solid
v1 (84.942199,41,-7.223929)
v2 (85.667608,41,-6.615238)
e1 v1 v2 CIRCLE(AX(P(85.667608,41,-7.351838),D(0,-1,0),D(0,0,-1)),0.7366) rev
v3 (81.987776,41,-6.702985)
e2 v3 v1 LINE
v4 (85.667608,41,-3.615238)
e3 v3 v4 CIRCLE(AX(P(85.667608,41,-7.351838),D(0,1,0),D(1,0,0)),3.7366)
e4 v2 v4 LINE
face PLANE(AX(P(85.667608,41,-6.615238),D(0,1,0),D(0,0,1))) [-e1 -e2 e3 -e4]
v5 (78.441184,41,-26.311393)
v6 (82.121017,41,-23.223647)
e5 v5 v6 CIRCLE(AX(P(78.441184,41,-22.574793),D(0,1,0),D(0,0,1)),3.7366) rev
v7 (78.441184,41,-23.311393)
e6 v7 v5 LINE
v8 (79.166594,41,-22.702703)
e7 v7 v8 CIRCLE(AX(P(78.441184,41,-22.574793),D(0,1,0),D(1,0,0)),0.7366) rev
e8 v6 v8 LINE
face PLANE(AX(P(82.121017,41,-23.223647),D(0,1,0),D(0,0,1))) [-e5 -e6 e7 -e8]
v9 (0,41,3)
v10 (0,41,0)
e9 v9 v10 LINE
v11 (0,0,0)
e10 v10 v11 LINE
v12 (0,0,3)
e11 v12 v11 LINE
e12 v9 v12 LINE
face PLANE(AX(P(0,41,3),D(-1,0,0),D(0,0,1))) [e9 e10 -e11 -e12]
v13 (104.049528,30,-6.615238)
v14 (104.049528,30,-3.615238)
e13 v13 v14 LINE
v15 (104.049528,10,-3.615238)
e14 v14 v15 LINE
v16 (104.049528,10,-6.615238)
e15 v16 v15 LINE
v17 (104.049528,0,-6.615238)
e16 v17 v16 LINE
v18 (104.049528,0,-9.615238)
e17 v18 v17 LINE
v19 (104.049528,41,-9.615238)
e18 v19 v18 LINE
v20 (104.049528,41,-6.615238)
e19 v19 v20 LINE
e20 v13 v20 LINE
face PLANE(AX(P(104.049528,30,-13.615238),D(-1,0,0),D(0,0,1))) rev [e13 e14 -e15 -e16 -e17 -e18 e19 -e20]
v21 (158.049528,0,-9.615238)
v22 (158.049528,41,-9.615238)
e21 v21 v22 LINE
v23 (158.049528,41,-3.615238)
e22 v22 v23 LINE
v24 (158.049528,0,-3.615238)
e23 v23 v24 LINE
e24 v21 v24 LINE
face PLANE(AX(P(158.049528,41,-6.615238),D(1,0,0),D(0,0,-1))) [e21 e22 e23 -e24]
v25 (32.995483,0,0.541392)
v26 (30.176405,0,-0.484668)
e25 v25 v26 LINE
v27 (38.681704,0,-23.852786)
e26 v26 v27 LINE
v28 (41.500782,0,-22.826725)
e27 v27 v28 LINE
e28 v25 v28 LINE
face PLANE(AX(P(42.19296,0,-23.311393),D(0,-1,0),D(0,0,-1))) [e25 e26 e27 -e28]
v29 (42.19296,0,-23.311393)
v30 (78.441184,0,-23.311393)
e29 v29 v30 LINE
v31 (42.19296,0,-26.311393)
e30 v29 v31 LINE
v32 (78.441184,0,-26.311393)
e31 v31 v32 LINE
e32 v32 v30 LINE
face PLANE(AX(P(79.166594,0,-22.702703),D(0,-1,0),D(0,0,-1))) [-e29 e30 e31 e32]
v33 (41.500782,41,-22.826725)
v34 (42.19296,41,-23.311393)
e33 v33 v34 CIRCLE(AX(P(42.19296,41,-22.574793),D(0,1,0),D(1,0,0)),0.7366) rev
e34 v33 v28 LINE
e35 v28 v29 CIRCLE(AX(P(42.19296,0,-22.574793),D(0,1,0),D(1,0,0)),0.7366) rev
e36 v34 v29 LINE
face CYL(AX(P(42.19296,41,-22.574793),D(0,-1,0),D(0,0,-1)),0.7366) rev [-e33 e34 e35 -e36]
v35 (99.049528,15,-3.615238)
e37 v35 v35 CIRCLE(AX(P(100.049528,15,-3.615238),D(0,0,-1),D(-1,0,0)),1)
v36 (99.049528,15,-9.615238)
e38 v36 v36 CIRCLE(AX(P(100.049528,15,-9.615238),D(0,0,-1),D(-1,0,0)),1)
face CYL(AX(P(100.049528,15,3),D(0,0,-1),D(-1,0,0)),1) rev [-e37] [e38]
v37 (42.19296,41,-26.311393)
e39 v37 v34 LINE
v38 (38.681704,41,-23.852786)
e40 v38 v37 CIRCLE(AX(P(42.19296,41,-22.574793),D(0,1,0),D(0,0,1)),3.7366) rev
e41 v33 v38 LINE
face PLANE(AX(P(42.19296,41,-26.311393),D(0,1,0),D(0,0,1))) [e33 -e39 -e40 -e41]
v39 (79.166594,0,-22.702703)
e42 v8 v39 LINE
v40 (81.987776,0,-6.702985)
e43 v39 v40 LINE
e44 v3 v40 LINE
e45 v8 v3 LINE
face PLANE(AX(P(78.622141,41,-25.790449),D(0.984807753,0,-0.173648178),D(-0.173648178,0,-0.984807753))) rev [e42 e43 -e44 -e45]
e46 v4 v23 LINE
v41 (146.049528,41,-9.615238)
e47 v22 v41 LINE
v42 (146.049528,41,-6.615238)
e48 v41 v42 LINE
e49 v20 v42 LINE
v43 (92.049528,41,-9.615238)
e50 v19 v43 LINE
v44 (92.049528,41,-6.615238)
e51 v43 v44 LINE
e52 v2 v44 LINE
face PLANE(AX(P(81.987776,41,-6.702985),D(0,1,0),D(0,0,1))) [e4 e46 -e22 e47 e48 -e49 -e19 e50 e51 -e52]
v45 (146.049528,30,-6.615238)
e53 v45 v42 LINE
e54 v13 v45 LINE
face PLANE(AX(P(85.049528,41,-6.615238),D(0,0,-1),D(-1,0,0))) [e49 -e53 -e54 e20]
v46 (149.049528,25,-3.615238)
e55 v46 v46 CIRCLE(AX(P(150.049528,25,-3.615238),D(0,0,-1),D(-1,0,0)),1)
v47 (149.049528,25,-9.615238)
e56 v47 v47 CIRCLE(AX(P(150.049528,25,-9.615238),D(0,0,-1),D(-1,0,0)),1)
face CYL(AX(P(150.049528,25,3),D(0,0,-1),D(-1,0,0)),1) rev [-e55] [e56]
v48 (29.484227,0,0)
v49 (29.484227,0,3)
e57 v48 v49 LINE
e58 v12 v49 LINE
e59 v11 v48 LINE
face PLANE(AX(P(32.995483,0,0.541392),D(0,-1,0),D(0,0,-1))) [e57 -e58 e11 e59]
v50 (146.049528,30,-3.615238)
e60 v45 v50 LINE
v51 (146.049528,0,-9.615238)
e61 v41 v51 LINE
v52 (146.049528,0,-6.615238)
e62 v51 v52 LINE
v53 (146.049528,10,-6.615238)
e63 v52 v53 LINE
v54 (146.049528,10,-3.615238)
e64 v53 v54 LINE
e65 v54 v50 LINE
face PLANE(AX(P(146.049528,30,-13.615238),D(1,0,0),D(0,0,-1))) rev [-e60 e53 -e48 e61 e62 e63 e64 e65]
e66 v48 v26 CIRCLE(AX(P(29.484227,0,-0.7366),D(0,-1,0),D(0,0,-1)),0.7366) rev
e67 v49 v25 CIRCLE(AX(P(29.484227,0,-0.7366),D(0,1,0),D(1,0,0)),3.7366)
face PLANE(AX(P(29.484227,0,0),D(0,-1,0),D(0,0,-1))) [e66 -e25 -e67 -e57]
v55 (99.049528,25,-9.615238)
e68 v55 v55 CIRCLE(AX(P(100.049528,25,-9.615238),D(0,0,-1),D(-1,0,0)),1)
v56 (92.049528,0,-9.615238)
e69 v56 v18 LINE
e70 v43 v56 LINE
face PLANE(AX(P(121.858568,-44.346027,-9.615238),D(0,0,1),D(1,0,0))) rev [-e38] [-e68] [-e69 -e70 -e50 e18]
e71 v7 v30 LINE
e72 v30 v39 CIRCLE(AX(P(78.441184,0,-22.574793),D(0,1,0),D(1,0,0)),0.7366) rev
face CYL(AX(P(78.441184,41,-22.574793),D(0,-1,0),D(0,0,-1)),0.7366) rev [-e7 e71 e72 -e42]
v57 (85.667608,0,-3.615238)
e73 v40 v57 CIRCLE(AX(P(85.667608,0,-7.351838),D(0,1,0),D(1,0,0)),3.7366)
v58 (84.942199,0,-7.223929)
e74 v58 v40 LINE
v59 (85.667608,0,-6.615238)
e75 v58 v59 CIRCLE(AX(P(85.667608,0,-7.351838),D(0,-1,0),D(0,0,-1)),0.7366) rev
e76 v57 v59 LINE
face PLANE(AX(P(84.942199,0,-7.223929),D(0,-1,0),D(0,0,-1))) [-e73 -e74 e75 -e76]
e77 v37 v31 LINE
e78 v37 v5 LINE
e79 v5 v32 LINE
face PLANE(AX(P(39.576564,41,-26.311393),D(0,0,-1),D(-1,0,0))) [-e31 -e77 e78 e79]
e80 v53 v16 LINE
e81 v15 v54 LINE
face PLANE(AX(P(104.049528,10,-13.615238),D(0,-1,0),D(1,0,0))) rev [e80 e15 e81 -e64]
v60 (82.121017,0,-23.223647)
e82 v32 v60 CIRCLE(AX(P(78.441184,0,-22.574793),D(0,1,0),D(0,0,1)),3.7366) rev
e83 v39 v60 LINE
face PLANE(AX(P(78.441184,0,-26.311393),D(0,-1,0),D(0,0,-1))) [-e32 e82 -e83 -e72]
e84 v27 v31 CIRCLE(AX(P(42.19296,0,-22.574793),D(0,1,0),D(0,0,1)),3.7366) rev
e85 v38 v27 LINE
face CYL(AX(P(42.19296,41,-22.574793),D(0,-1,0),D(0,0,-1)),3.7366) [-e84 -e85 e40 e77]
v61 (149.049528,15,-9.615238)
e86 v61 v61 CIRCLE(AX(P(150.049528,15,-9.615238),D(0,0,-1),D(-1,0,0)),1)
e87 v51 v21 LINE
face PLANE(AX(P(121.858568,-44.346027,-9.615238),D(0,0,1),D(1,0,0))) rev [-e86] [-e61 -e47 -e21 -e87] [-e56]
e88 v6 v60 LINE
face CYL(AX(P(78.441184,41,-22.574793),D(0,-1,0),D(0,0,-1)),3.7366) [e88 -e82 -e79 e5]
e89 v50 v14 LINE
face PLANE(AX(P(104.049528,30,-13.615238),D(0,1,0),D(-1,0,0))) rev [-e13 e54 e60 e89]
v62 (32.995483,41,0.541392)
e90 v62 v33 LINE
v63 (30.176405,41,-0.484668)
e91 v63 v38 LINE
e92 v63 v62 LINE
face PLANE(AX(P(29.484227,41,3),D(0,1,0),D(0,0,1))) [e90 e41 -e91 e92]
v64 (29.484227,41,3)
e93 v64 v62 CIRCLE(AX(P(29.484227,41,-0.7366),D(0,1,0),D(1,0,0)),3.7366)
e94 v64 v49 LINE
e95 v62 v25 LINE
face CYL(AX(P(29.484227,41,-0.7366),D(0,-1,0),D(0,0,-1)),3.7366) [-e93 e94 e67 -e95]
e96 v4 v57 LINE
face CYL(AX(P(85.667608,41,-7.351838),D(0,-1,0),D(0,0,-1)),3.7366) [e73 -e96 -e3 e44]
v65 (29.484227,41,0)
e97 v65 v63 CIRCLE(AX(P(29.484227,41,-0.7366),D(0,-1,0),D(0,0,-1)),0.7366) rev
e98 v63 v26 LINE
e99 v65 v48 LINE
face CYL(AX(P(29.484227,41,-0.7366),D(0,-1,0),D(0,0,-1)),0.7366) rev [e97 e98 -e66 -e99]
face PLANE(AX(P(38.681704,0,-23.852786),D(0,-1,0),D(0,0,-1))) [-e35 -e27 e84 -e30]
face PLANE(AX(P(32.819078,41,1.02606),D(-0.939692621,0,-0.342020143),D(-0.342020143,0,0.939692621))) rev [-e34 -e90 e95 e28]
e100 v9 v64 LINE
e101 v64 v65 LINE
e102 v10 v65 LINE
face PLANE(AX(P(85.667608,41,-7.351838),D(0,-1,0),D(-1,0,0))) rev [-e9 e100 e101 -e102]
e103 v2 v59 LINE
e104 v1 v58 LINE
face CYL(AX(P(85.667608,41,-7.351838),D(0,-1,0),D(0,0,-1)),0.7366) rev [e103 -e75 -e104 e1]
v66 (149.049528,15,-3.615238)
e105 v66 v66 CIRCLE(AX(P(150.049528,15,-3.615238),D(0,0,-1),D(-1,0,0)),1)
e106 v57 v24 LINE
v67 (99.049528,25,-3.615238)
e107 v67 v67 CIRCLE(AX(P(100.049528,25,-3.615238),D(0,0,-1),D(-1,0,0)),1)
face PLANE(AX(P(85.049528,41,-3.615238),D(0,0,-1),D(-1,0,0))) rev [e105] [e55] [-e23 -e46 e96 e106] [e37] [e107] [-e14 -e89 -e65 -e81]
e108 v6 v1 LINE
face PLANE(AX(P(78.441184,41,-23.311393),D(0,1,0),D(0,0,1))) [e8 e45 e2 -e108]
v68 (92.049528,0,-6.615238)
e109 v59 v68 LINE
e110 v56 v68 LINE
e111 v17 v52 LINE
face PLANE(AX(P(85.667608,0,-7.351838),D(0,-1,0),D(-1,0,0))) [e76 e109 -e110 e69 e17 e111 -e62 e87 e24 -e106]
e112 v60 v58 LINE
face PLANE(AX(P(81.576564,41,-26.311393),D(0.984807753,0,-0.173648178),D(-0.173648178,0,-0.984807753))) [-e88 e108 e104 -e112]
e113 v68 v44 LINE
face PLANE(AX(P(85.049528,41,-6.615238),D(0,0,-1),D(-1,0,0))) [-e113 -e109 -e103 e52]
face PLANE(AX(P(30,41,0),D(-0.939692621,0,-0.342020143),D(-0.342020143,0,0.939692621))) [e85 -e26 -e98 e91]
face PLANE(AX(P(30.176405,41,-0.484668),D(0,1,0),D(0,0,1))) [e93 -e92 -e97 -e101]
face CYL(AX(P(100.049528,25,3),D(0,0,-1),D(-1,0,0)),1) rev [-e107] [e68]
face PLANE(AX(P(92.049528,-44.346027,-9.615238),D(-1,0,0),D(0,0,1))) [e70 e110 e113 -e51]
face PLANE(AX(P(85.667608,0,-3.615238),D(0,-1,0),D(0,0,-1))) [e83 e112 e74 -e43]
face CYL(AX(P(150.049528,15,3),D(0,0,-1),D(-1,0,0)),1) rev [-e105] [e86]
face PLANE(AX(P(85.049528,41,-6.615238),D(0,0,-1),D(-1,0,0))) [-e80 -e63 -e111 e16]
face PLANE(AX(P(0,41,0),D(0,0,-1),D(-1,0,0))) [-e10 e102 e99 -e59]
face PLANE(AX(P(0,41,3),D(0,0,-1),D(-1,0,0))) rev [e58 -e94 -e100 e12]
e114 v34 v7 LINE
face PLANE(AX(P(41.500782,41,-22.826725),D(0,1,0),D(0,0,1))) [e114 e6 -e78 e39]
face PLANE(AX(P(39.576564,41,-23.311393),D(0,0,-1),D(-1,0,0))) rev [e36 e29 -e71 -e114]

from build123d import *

# Parameters (mm, degrees)
BASE_FLANGE1_DEPTH  = 41
SKETCH2_W           = 42
SKETCH2_H           = 20
CUT_EXTRUDE1_DEPTH  = 10
BOSS_EXTRUDE1_DEPTH = 6
SKETCH5_R           = 1
CUT_EXTRUDE3_DEPTH  = 165.132308696


# Sheet-metal steps are written as plain solids
with BuildPart() as part:
    # Sketch1 → Base-Flange1 (new body)
    with BuildSketch(Plane(origin=(0, 0, 0), x_dir=(1, 0, 0), z_dir=(0, 1, 0))):
        with BuildLine():
            Line((0, 0), (29.484227127, 0))
            ThreePointArc((29.484227127, 0), (29.90672353, 0.133212604), (30.176404712, 0.484667962))
            Line((30.176404712, 0.484667962), (38.681704054, 23.85278585))
            ThreePointArc((38.681704054, 23.85278585), (40.049733788, 25.635636911), (42.1929595, 26.311393382))
            Line((42.1929595, 26.311393382), (78.441184331, 26.311393382))
            ThreePointArc((78.441184331, 26.311393382), (80.843024514, 25.437195048), (82.121016981, 23.223647163))
            Line((82.121016981, 23.223647163), (84.942198964, 7.223929074))
            ThreePointArc((84.942198964, 7.223929074), (85.194131001, 6.787569985), (85.667608355, 6.615238322))
            Line((85.667608355, 6.615238322), (158.049527566, 6.615238322))
            Line((158.049527566, 6.615238322), (158.049527566, 3.615238322))
            Line((158.049527566, 3.615238322), (85.667608355, 3.615238322))
            ThreePointArc((85.667608355, 3.615238322), (83.265768172, 4.489436656), (81.987775705, 6.702984541))
            Line((81.987775705, 6.702984541), (79.166593722, 22.70270263))
            ThreePointArc((79.166593722, 22.70270263), (78.914661685, 23.139061719), (78.441184331, 23.311393382))
            Line((78.441184331, 23.311393382), (42.1929595, 23.311393382))
            ThreePointArc((42.1929595, 23.311393382), (41.770463097, 23.178180778), (41.500781916, 22.82672542))
            Line((41.500781916, 22.82672542), (32.995482574, -0.541392468))
            ThreePointArc((32.995482574, -0.541392468), (31.627452839, -2.324243529), (29.484227127, -3))
            Line((29.484227127, -3), (0, -3))
            Line((0, -3), (0, 0))
        make_face()
    extrude(amount=BASE_FLANGE1_DEPTH)

    # Sketch2 → Cut-Extrude1 (cut)
    with BuildSketch(Plane.XY.offset(-3.615238322)):
        with Locations((125.049527566, 20)):
            Rectangle(SKETCH2_W, SKETCH2_H)
    extrude(amount=-CUT_EXTRUDE1_DEPTH, mode=Mode.SUBTRACT)

    # Sketch3 → Boss-Extrude1 (add)
    with BuildSketch(Plane.XY.offset(-3.615238322)):
        Polygon((104.049527566, 30), (104.049527566, 41), (92.049527566, 41), (92.049527566, 0), (104.049527566, 0), (104.049527566, 10), align=None)
        Polygon((158.049527566, 0), (158.049527566, 41), (146.049527566, 41), (146.049527566, 30), (146.049527566, 10), (146.049527566, 0), align=None)
    extrude(amount=-BOSS_EXTRUDE1_DEPTH)

    # Sketch5 → Cut-Extrude3 (cut, through all)
    with BuildSketch(Plane(origin=(0, 0, -9.615238322), x_dir=(-1, 0, 0), z_dir=(0, 0, -1))):
        with Locations((-100.049527566, 25)):
            Circle(SKETCH5_R)
        with Locations((-100.049527566, 15)):
            Circle(SKETCH5_R)
        with Locations((-150.049527566, 15)):
            Circle(SKETCH5_R)
        with Locations((-150.049527566, 25)):
            Circle(SKETCH5_R)
    extrude(amount=-CUT_EXTRUDE3_DEPTH, mode=Mode.SUBTRACT)


solid = part.part
